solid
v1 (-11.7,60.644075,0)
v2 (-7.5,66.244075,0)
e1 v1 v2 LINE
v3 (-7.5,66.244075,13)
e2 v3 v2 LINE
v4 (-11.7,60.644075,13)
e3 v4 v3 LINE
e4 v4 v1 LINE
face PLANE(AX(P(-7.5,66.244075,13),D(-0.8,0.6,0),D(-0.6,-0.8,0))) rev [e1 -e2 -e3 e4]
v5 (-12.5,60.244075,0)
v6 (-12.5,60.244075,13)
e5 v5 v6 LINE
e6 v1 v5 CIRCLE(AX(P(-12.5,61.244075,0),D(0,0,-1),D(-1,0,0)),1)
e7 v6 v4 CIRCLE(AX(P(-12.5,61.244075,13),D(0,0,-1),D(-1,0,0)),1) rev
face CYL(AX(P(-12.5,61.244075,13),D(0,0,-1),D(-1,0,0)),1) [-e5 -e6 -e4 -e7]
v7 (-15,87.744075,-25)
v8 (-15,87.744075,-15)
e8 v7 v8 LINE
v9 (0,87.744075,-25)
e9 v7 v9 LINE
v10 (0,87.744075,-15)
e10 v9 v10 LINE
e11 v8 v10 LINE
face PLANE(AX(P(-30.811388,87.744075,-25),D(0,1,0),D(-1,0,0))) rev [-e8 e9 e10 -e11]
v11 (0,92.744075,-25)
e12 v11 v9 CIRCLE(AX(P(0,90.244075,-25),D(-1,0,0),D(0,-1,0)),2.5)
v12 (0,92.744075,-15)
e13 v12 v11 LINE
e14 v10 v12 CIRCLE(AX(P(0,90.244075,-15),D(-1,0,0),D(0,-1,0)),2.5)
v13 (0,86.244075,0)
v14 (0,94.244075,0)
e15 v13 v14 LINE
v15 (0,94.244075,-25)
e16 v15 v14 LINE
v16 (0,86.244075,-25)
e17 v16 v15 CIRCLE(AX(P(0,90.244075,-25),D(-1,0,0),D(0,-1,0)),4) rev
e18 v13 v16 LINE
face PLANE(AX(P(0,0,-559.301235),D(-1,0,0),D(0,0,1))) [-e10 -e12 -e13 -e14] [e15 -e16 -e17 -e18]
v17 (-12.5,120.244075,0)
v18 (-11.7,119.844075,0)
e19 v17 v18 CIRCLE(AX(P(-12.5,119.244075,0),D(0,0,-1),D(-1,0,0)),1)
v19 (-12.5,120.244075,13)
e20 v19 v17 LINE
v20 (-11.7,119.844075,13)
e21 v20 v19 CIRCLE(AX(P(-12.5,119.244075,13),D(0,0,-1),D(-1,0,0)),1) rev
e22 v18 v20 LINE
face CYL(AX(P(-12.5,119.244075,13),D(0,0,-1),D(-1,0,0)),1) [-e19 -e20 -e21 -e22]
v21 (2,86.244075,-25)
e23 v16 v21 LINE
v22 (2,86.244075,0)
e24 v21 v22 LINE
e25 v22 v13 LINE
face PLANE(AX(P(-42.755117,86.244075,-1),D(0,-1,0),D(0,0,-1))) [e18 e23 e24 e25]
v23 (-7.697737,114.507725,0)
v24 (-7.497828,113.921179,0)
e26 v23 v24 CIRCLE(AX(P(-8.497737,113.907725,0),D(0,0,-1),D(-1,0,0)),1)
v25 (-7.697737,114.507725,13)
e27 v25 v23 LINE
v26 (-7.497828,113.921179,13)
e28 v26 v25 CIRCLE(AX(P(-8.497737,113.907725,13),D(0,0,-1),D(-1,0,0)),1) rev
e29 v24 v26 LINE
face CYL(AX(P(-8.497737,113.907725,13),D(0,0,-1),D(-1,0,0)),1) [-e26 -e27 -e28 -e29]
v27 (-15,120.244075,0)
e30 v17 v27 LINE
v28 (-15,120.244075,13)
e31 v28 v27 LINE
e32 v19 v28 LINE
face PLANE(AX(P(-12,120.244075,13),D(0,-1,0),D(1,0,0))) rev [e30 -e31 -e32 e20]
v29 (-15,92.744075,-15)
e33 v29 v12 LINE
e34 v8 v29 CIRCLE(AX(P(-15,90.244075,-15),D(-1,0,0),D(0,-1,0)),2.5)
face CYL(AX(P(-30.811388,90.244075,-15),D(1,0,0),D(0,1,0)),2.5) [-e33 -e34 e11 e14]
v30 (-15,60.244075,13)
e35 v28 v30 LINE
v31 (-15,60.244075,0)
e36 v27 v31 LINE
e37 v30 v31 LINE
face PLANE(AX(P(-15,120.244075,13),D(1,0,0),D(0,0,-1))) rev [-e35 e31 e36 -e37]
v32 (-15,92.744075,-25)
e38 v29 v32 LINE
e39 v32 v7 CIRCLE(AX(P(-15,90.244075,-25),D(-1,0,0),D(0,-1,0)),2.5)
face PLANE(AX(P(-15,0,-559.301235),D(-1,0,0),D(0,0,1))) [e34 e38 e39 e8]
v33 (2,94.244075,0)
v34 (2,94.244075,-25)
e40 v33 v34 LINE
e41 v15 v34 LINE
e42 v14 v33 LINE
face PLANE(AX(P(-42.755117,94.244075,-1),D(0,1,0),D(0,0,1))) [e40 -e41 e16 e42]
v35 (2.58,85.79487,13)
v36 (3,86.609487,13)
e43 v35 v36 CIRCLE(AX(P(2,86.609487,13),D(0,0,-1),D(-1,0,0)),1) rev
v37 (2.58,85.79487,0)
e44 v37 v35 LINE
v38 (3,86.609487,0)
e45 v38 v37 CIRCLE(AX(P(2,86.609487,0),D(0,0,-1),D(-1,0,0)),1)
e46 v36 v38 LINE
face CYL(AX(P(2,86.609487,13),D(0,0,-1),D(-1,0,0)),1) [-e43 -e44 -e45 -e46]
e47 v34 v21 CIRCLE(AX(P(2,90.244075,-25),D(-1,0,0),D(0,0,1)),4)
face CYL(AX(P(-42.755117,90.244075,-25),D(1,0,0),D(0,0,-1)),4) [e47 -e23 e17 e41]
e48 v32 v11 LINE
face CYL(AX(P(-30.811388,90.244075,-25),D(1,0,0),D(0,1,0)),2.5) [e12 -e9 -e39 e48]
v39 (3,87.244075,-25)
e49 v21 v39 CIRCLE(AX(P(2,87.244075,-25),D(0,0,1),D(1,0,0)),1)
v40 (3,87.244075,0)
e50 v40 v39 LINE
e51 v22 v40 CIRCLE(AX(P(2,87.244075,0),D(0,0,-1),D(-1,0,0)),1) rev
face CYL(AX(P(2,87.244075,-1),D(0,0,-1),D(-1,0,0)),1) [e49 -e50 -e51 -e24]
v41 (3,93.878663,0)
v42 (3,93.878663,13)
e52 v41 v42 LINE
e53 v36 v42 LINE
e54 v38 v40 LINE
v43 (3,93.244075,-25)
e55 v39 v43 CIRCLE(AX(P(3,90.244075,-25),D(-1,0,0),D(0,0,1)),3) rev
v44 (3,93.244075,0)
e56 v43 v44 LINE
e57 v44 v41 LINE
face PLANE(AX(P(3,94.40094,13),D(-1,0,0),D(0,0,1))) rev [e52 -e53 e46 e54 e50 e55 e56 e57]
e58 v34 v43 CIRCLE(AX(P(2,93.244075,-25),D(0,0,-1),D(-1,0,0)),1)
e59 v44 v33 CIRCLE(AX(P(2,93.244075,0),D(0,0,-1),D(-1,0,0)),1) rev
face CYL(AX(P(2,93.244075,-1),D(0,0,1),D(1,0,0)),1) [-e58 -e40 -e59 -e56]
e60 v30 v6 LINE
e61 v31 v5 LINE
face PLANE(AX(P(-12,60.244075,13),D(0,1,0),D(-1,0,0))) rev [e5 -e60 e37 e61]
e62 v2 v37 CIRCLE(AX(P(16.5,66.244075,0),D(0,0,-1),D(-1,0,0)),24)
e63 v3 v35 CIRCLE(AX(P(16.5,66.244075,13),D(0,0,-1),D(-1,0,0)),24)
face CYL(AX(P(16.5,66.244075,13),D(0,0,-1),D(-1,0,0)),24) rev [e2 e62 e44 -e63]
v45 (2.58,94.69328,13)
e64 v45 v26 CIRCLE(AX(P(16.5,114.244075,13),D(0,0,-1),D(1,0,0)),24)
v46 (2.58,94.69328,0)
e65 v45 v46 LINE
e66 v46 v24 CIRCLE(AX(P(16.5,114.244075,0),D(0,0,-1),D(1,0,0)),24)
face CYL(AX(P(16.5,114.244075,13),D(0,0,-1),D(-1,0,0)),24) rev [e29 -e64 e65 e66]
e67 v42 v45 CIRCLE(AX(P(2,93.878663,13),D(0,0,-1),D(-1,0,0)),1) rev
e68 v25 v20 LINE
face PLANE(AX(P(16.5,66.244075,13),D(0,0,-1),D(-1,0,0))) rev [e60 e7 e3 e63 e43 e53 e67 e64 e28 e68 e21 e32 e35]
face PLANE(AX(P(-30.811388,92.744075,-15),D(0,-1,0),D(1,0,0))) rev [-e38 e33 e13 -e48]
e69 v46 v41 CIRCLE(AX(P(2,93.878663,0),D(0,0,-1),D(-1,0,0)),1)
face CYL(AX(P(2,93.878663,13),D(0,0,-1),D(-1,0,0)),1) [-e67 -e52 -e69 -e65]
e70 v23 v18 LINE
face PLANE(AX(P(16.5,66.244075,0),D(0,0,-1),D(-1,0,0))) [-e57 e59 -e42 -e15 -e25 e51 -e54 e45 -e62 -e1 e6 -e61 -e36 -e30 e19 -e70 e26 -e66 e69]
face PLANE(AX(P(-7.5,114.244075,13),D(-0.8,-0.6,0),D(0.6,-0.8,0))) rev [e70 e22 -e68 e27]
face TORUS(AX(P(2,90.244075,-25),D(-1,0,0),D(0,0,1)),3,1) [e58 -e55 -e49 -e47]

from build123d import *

# Parameters (mm, degrees)
EXTRUDE_1_DEPTH  = 13
EXTRUDE_2_DEPTH  = 3
EXTRUDE_3_DEPTH  = 15
FILLET_1_R       = 1
FILLET_2_R       = 1
FILLET_START     = -29.0000001
FILLET_3_DEPTH   = 29.0000001
FILLET_3_2_ANGLE = 180
FILLET_4_R       = 1
FILLET_5_R       = 1
FILLET_8_R       = 1


with BuildPart() as part:
    # 草图1 → 凸台-拉伸1 (new body)
    with BuildSketch(Plane.XY):
        with BuildLine():
            Line((-7.5, 114.244075086), (-12, 120.244075086))
            Line((-12, 120.244075086), (-15, 120.244075086))
            Line((-15, 120.244075086), (-15, 60.244075086))
            Line((-15, 60.244075086), (-12, 60.244075086))
            Line((-12, 60.244075086), (-7.5, 66.244075086))
            ThreePointArc((-7.5, 66.244075086), (-4.713203436, 77.469047246), (3, 86.087209919))
            Line((3, 86.087209919), (3, 94.400940253))
            ThreePointArc((3, 94.400940253), (-4.713203436, 103.019102925), (-7.5, 114.244075086))
        make_face()
    extrude(amount=EXTRUDE_1_DEPTH)

    # 草图3 → 凸台-拉伸2 (add)
    with BuildSketch(Plane(origin=(3, 0, 0), x_dir=(0, 0, -1), z_dir=(1, 0, 0))):
        with BuildLine():
            Line((1, 86.244075086), (-9, 86.244075086))
            ThreePointArc((-9, 86.244075086), (-13, 90.244075086), (-9, 94.244075086))
            Line((-9, 94.244075086), (1, 94.244075086))
            Line((1, 94.244075086), (15, 94.244075086))
            Line((15, 94.244075086), (25, 94.244075086))
            ThreePointArc((25, 94.244075086), (29, 90.244075086), (25, 86.244075086))
            Line((25, 86.244075086), (15, 86.244075086))
            Line((15, 86.244075086), (1, 86.244075086))
        make_face()
    extrude(amount=-EXTRUDE_2_DEPTH)

    # 草图4 → 凸台-拉伸3 (add)
    with BuildSketch(Plane.ZY):
        with BuildLine():
            Line((-15, 92.744075086), (-25, 92.744075086))
            ThreePointArc((-25, 92.744075086), (-27.5, 90.244075086), (-25, 87.744075086))
            Line((-25, 87.744075086), (-15, 87.744075086))
            ThreePointArc((-15, 87.744075086), (-12.5, 90.244075086), (-15, 92.744075086))
        make_face()
    extrude(amount=EXTRUDE_3_DEPTH)

    # 圆角1
    fillet_1_edges = [part.edges().sort_by_distance(p)[0] for p in [
        (3, 94.400940253, 6.5),
    ]]
    fillet(fillet_1_edges, radius=FILLET_1_R)

    # 圆角2
    fillet_2_edges = [part.edges().sort_by_distance(p)[0] for p in [
        (3, 86.087209919, 6.5),
    ]]
    fillet(fillet_2_edges, radius=FILLET_2_R)

    # 圆角3: read off the stored shape, not the designer's step
    # 圆角3 outline → 圆角3 (cut)
    with BuildSketch(Plane.XY.offset(FILLET_START)):
        with BuildLine():
            ThreePointArc((2, 94.244075086), (2.707106781, 93.951181867), (3, 93.244075086))
            Line((3, 93.244075086), (3, 93.878663231))
            ThreePointArc((3, 93.878663231), (2.9825594, 94.064612221), (2.930845947, 94.244075086))
            Line((2.930845947, 94.244075086), (2, 94.244075086))
        make_face()
        with BuildLine():
            Line((3, 86.60948694), (3, 87.244075086))
            ThreePointArc((3, 87.244075086), (2.707106781, 86.536968305), (2, 86.244075086))
            Line((2, 86.244075086), (2.930845947, 86.244075086))
            ThreePointArc((2.930845947, 86.244075086), (2.982559399, 86.423537951), (3, 86.60948694))
        make_face()
    extrude(amount=FILLET_3_DEPTH, mode=Mode.SUBTRACT)

    # Fillet 3 2 outline → Fillet 3 2 (revolve, cut)
    with BuildSketch(Plane(origin=(0, 90.244075086, -25), x_dir=(0, -1, 0), z_dir=(0, 0, 1))):
        with BuildLine():
            Line((4, 3), (3, 3))
            ThreePointArc((3, 3), (3.707106781, 2.707106781), (4, 2))
            Line((4, 2), (4, 3))
        make_face()
    revolve(axis=Axis((0, 90.244075086, -25), (1, 0, 0)), revolution_arc=FILLET_3_2_ANGLE, mode=Mode.SUBTRACT)

    # 圆角4
    fillet_4_edges = [part.edges().sort_by_distance(p)[0] for p in [
        (-12, 60.244075086, 6.5),
    ]]
    fillet(fillet_4_edges, radius=FILLET_4_R)

    # 圆角5
    fillet_5_edges = [part.edges().sort_by_distance(p)[0] for p in [
        (-12, 120.244075086, 6.5),
    ]]
    fillet(fillet_5_edges, radius=FILLET_5_R)

    # 圆角8
    fillet_8_edges = [part.edges().sort_by_distance(p)[0] for p in [
        (-7.5, 114.244075086, 6.5),
    ]]
    fillet(fillet_8_edges, radius=FILLET_8_R)


solid = part.part
